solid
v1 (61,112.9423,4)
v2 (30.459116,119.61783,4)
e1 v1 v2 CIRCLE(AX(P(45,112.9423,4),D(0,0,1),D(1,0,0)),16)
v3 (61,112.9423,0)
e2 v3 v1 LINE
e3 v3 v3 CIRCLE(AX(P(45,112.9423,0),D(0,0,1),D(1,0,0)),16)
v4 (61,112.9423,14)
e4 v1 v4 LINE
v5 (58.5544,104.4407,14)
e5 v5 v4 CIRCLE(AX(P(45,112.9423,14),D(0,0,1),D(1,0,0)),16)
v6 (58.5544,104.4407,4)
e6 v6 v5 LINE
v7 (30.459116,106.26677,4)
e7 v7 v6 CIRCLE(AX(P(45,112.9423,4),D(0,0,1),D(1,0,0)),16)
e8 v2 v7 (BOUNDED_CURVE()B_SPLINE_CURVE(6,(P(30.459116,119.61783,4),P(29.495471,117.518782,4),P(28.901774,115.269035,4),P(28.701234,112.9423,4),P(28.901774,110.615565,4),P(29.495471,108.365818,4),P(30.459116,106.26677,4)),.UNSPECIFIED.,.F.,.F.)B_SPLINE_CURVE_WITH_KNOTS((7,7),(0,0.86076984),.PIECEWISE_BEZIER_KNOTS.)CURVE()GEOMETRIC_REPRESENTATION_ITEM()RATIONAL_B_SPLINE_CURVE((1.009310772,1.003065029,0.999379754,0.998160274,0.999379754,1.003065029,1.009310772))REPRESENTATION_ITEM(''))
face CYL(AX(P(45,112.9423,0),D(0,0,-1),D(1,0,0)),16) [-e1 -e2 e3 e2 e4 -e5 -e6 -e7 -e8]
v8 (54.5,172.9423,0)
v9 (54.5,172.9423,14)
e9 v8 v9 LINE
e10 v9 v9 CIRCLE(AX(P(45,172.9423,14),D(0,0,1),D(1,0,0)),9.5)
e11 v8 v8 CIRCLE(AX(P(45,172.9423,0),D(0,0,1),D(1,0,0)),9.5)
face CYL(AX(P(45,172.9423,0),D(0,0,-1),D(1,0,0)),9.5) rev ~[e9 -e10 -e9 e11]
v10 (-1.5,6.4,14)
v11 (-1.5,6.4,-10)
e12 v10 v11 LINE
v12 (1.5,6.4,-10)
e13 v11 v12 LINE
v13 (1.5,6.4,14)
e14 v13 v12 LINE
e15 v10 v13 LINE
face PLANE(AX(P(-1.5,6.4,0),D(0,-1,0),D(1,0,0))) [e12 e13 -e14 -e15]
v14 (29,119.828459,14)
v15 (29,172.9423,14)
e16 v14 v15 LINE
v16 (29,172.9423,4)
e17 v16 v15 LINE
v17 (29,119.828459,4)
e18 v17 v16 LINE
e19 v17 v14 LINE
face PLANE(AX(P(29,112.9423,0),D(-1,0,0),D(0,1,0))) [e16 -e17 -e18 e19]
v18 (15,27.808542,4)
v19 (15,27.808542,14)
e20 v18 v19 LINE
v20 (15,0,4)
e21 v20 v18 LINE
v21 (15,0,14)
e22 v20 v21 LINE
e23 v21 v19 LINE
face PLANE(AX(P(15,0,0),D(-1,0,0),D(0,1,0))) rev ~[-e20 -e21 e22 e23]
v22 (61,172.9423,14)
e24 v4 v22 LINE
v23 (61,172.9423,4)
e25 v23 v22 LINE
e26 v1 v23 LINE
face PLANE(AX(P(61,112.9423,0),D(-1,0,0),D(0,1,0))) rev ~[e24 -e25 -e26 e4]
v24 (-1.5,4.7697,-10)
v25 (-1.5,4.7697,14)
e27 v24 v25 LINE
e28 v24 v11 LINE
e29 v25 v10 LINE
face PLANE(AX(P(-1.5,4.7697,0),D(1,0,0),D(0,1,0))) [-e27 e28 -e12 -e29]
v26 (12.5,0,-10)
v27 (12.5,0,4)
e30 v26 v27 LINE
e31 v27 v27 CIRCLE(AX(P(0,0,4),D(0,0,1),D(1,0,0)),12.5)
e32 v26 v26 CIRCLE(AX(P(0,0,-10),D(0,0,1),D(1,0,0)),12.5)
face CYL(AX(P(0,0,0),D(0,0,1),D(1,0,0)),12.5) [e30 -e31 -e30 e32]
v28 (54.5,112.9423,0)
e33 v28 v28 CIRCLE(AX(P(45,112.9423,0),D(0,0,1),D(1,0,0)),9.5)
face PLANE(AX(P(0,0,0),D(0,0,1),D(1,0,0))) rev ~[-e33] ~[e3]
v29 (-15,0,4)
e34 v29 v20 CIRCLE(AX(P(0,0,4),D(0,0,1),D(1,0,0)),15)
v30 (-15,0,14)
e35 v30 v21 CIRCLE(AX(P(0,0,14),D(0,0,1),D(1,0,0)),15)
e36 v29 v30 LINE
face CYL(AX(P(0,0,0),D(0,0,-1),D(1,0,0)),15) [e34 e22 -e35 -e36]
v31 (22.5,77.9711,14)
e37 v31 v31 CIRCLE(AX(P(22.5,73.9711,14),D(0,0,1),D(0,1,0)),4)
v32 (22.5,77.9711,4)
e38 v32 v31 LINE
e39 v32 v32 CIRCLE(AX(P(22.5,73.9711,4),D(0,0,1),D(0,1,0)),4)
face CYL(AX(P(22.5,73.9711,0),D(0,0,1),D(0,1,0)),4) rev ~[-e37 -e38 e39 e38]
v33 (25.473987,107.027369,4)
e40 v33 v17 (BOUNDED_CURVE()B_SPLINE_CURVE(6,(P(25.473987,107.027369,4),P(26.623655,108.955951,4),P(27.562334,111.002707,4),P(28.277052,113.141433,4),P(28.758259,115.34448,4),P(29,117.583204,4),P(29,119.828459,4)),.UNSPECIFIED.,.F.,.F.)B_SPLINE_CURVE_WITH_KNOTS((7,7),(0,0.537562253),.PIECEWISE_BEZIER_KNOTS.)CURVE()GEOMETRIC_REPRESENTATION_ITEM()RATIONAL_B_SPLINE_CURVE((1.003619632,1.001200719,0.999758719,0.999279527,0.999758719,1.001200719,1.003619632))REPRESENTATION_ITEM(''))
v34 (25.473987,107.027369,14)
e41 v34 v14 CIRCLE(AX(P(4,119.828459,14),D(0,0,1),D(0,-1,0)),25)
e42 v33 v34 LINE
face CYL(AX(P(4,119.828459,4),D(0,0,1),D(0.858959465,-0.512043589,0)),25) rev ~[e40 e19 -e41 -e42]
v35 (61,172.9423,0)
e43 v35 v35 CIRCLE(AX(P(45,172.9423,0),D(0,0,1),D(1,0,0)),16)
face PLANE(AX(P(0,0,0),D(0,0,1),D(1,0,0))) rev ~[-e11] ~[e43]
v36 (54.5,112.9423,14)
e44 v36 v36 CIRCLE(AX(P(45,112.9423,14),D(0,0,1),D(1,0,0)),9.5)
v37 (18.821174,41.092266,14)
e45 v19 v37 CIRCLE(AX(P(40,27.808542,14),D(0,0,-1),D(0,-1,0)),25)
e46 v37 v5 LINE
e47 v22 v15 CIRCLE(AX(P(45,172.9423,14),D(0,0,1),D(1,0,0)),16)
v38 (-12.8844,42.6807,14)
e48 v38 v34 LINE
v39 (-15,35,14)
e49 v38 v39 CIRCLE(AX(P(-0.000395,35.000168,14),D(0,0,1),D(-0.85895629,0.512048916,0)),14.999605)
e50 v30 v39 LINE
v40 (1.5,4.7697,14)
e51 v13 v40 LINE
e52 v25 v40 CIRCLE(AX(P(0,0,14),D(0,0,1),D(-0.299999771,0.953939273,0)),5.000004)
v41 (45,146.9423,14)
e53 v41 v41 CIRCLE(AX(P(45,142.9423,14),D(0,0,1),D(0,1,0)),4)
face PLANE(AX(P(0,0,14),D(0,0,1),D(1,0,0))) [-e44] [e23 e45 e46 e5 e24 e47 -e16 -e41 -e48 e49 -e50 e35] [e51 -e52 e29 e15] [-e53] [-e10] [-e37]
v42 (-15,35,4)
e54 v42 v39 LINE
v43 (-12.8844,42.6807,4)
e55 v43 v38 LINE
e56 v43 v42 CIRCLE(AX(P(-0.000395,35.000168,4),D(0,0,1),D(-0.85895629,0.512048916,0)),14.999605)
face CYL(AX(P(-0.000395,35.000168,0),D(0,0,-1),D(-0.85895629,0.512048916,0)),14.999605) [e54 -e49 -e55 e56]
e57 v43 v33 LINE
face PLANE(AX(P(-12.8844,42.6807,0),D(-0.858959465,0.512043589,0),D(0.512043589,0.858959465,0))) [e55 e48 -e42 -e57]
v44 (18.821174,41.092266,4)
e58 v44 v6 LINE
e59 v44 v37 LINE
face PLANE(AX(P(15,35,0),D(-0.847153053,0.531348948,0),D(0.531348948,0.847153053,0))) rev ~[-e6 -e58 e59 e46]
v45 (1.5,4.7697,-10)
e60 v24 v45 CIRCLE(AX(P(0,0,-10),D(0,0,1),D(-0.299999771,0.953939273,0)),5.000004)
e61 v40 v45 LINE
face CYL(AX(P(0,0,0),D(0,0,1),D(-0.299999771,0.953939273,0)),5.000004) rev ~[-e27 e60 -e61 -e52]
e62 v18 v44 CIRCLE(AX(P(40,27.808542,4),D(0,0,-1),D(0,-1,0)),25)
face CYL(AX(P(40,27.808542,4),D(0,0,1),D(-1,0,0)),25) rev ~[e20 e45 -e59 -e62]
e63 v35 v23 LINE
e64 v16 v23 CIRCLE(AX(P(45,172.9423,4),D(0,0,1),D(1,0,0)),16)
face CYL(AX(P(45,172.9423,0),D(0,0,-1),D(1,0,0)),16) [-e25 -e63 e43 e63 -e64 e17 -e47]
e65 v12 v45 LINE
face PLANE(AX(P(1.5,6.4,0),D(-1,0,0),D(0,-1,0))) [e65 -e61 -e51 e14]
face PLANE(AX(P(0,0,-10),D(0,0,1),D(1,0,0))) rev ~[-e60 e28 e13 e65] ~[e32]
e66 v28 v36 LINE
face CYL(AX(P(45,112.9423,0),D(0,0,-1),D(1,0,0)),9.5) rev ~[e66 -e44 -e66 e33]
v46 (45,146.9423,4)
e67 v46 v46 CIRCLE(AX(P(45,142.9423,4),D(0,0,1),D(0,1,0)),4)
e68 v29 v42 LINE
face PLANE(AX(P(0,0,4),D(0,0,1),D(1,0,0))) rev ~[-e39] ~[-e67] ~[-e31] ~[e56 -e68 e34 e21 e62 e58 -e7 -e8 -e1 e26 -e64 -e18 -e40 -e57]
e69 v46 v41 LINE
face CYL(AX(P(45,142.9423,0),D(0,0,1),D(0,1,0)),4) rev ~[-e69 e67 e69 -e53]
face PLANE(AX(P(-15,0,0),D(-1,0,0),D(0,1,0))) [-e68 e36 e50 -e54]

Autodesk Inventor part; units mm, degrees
ref_plane "YZ Plane" through (0, 0, 0) normal (1, 0, 0) x (0, 1, 0)
ref_plane "XZ Plane" through (0, 0, 0) normal (0, 1, 0) x (-1, 0, 0)
sketch "Skizze1" plane through (0, 0, 0) normal (0, 0, 1) x (1, 0, 0)
  arc A0 (-1.5, 4.7697) -> (1.5, 4.7697) centre (0, 0) ccw
  circle A1 centre (0, 0) radius 12.5
  line L0 (-30.9429, 0) -> (77.0229, 0) construction
  circle A2 centre (0, 0) radius 15
  circle A3 centre (45, 112.9423) radius 16
  line L1 (61, 112.9423) -> (61, 172.9423)
  line L2 (29, 112.9423) -> (29, 172.9423)
  line L3 (45, 112.9423) -> (45, 188.9423) construction
  line L4 (45, 112.9423) -> (45, 128.9423) construction
  line L5 (29, 112.9423) -> (61, 112.9423) construction
  line L6 (-15, 0) -> (-15, 35)
  line L7 (15, 0) -> (15, 35)
  line L8 (-15, 35) -> (15, 35) construction
  circle A4 centre (0, 35) radius 15 construction
  line L9 (-12.8844, 42.6807) -> (29, 112.9423)
  arc A5 (-12.8844, 42.6807) -> (-15, 35) centre (0, 35) ccw
  line L10 (15, 35) -> (58.5544, 104.4407)
  arc A6 (58.5544, 104.4407) -> (61, 112.9423) centre (45, 112.9423) ccw
  line L11 (0, 35) -> (45, 112.9423) construction
  circle A7 centre (45, 172.9423) radius 16
  circle A8 centre (45, 172.9423) radius 9.5
  circle A9 centre (45, 112.9423) radius 9.5
  line L12 (-1.5, 6.4) -> (1.5, 6.4)
  line L13 (1.5, 6.4) -> (1.5, 4.7697)
  line L14 (-1.5, 4.7697) -> (-1.5, 6.4)
  line L15 (0, 0) -> (0, 5) construction
  line L16 (0, 5) -> (1.5, 5) construction
  circle A10 centre (45, 112.9423) radius 12.75 construction
  circle A11 centre (45, 172.9423) radius 12.75 construction
  line L17 (0, 0) -> (45, 172.9423) construction
  point P0 (22.5, 73.9711)
  point P1 (45, 142.9423)
  point P2 (-13, 0)
  point P3 (13, 0)
  point P4 (0, 6.4)
  point P5 (45, 125.6923)
  point P6 (33.9582, 106.5673)
  point P7 (56.0418, 106.5673)
  point P8 (45, 185.6923)
  point P9 (33.9582, 166.5673)
  point P10 (56.0418, 166.5673)
  dimension "d69" = 25.5
  dimension "ParallelHebel_Passflansch_HoleDia" = 25.5
  dimension "d0" = 10
  dimension "d1" = 25
  dimension "d4" = 30
  dimension "d36" = 0
  dimension "ParallelHebel_Gabelgelenk_OuterDia" = 32
  dimension "d38" = 60
  dimension "d39" = 35
  dimension "d40" = 90
  dimension "d41" = 60
  dimension "d42" = 45
  dimension "d43" = 19
  dimension "Nadellager_OuterDia" = 19
  dimension "d45" = 30
  dimension "d51" = 3
  dimension "d52" = 1.4
  dimension "d67" = 360
  dimension "d72" = 360
  dimension "Distanze_daVinciHead_Pivot" = 172.9423
extrude "Extrusion1" add sketch "Skizze1" against normal blind 10 contours A1
extrude "Extrusion2" add sketch "Skizze1" along normal blind 14 contours A1 | A2 | A2 L6 A5 L9 A3 L10 L7 | A3 | L2 A7 L1 A3 | A7
extrude "Extrusion4" cut sketch "Skizze1" along normal blind 4 contours A2 | A2 L6 A5 L9 A3 L10 L7 | L2 A7 L1 A3
fillet "Rundung1" radius 25 2 edges at (29, 112.9423, 9) (15, 35, 9)
hole "Bohrung2" at (45, 142.9423, 0) at (22.5, 73.9711, 0) direction (0, 0, 1) diameter 8 end through all
ref_plane "Arbeitsebene1" through (45, 112.9423, 0) normal (-1, 0, 0) x (0, 0, 1)
sketch "Skizze4" plane through (15, 0, 14) normal (1, 0, 0) x (0, 0, -1)
  line L0 (24, -12.5) -> (24, 12.5) construction
  line L1 (10, 41.0923) -> (10, 104.4407) construction
  line L2 (0, 41.0923) -> (0, 104.4407) construction
  line L3 (10, 112.9423) -> (10, 172.9423) construction
  line L4 (14, 156.9423) -> (14, 188.9423) construction
  point P0 (14, 0)
  dimension "ParallelMech_Distance_Step2Flat" = 14
  dimension "TrueLeverThickness" = 10
  dimension "ParallelMecha_BearingSide_Step" = 4
equation "\"NKX_10_RiadialPart_Dia\" = 19"
equation "\"Lager_Bohrung_Durchmesser\" = 19"
equation "\"Lager_Einbautiefe\" = 14"
properties part number "ParallelSystem_ProximalPart_Driven_v2.1_AxialNadellager" material "Edelstahl"
